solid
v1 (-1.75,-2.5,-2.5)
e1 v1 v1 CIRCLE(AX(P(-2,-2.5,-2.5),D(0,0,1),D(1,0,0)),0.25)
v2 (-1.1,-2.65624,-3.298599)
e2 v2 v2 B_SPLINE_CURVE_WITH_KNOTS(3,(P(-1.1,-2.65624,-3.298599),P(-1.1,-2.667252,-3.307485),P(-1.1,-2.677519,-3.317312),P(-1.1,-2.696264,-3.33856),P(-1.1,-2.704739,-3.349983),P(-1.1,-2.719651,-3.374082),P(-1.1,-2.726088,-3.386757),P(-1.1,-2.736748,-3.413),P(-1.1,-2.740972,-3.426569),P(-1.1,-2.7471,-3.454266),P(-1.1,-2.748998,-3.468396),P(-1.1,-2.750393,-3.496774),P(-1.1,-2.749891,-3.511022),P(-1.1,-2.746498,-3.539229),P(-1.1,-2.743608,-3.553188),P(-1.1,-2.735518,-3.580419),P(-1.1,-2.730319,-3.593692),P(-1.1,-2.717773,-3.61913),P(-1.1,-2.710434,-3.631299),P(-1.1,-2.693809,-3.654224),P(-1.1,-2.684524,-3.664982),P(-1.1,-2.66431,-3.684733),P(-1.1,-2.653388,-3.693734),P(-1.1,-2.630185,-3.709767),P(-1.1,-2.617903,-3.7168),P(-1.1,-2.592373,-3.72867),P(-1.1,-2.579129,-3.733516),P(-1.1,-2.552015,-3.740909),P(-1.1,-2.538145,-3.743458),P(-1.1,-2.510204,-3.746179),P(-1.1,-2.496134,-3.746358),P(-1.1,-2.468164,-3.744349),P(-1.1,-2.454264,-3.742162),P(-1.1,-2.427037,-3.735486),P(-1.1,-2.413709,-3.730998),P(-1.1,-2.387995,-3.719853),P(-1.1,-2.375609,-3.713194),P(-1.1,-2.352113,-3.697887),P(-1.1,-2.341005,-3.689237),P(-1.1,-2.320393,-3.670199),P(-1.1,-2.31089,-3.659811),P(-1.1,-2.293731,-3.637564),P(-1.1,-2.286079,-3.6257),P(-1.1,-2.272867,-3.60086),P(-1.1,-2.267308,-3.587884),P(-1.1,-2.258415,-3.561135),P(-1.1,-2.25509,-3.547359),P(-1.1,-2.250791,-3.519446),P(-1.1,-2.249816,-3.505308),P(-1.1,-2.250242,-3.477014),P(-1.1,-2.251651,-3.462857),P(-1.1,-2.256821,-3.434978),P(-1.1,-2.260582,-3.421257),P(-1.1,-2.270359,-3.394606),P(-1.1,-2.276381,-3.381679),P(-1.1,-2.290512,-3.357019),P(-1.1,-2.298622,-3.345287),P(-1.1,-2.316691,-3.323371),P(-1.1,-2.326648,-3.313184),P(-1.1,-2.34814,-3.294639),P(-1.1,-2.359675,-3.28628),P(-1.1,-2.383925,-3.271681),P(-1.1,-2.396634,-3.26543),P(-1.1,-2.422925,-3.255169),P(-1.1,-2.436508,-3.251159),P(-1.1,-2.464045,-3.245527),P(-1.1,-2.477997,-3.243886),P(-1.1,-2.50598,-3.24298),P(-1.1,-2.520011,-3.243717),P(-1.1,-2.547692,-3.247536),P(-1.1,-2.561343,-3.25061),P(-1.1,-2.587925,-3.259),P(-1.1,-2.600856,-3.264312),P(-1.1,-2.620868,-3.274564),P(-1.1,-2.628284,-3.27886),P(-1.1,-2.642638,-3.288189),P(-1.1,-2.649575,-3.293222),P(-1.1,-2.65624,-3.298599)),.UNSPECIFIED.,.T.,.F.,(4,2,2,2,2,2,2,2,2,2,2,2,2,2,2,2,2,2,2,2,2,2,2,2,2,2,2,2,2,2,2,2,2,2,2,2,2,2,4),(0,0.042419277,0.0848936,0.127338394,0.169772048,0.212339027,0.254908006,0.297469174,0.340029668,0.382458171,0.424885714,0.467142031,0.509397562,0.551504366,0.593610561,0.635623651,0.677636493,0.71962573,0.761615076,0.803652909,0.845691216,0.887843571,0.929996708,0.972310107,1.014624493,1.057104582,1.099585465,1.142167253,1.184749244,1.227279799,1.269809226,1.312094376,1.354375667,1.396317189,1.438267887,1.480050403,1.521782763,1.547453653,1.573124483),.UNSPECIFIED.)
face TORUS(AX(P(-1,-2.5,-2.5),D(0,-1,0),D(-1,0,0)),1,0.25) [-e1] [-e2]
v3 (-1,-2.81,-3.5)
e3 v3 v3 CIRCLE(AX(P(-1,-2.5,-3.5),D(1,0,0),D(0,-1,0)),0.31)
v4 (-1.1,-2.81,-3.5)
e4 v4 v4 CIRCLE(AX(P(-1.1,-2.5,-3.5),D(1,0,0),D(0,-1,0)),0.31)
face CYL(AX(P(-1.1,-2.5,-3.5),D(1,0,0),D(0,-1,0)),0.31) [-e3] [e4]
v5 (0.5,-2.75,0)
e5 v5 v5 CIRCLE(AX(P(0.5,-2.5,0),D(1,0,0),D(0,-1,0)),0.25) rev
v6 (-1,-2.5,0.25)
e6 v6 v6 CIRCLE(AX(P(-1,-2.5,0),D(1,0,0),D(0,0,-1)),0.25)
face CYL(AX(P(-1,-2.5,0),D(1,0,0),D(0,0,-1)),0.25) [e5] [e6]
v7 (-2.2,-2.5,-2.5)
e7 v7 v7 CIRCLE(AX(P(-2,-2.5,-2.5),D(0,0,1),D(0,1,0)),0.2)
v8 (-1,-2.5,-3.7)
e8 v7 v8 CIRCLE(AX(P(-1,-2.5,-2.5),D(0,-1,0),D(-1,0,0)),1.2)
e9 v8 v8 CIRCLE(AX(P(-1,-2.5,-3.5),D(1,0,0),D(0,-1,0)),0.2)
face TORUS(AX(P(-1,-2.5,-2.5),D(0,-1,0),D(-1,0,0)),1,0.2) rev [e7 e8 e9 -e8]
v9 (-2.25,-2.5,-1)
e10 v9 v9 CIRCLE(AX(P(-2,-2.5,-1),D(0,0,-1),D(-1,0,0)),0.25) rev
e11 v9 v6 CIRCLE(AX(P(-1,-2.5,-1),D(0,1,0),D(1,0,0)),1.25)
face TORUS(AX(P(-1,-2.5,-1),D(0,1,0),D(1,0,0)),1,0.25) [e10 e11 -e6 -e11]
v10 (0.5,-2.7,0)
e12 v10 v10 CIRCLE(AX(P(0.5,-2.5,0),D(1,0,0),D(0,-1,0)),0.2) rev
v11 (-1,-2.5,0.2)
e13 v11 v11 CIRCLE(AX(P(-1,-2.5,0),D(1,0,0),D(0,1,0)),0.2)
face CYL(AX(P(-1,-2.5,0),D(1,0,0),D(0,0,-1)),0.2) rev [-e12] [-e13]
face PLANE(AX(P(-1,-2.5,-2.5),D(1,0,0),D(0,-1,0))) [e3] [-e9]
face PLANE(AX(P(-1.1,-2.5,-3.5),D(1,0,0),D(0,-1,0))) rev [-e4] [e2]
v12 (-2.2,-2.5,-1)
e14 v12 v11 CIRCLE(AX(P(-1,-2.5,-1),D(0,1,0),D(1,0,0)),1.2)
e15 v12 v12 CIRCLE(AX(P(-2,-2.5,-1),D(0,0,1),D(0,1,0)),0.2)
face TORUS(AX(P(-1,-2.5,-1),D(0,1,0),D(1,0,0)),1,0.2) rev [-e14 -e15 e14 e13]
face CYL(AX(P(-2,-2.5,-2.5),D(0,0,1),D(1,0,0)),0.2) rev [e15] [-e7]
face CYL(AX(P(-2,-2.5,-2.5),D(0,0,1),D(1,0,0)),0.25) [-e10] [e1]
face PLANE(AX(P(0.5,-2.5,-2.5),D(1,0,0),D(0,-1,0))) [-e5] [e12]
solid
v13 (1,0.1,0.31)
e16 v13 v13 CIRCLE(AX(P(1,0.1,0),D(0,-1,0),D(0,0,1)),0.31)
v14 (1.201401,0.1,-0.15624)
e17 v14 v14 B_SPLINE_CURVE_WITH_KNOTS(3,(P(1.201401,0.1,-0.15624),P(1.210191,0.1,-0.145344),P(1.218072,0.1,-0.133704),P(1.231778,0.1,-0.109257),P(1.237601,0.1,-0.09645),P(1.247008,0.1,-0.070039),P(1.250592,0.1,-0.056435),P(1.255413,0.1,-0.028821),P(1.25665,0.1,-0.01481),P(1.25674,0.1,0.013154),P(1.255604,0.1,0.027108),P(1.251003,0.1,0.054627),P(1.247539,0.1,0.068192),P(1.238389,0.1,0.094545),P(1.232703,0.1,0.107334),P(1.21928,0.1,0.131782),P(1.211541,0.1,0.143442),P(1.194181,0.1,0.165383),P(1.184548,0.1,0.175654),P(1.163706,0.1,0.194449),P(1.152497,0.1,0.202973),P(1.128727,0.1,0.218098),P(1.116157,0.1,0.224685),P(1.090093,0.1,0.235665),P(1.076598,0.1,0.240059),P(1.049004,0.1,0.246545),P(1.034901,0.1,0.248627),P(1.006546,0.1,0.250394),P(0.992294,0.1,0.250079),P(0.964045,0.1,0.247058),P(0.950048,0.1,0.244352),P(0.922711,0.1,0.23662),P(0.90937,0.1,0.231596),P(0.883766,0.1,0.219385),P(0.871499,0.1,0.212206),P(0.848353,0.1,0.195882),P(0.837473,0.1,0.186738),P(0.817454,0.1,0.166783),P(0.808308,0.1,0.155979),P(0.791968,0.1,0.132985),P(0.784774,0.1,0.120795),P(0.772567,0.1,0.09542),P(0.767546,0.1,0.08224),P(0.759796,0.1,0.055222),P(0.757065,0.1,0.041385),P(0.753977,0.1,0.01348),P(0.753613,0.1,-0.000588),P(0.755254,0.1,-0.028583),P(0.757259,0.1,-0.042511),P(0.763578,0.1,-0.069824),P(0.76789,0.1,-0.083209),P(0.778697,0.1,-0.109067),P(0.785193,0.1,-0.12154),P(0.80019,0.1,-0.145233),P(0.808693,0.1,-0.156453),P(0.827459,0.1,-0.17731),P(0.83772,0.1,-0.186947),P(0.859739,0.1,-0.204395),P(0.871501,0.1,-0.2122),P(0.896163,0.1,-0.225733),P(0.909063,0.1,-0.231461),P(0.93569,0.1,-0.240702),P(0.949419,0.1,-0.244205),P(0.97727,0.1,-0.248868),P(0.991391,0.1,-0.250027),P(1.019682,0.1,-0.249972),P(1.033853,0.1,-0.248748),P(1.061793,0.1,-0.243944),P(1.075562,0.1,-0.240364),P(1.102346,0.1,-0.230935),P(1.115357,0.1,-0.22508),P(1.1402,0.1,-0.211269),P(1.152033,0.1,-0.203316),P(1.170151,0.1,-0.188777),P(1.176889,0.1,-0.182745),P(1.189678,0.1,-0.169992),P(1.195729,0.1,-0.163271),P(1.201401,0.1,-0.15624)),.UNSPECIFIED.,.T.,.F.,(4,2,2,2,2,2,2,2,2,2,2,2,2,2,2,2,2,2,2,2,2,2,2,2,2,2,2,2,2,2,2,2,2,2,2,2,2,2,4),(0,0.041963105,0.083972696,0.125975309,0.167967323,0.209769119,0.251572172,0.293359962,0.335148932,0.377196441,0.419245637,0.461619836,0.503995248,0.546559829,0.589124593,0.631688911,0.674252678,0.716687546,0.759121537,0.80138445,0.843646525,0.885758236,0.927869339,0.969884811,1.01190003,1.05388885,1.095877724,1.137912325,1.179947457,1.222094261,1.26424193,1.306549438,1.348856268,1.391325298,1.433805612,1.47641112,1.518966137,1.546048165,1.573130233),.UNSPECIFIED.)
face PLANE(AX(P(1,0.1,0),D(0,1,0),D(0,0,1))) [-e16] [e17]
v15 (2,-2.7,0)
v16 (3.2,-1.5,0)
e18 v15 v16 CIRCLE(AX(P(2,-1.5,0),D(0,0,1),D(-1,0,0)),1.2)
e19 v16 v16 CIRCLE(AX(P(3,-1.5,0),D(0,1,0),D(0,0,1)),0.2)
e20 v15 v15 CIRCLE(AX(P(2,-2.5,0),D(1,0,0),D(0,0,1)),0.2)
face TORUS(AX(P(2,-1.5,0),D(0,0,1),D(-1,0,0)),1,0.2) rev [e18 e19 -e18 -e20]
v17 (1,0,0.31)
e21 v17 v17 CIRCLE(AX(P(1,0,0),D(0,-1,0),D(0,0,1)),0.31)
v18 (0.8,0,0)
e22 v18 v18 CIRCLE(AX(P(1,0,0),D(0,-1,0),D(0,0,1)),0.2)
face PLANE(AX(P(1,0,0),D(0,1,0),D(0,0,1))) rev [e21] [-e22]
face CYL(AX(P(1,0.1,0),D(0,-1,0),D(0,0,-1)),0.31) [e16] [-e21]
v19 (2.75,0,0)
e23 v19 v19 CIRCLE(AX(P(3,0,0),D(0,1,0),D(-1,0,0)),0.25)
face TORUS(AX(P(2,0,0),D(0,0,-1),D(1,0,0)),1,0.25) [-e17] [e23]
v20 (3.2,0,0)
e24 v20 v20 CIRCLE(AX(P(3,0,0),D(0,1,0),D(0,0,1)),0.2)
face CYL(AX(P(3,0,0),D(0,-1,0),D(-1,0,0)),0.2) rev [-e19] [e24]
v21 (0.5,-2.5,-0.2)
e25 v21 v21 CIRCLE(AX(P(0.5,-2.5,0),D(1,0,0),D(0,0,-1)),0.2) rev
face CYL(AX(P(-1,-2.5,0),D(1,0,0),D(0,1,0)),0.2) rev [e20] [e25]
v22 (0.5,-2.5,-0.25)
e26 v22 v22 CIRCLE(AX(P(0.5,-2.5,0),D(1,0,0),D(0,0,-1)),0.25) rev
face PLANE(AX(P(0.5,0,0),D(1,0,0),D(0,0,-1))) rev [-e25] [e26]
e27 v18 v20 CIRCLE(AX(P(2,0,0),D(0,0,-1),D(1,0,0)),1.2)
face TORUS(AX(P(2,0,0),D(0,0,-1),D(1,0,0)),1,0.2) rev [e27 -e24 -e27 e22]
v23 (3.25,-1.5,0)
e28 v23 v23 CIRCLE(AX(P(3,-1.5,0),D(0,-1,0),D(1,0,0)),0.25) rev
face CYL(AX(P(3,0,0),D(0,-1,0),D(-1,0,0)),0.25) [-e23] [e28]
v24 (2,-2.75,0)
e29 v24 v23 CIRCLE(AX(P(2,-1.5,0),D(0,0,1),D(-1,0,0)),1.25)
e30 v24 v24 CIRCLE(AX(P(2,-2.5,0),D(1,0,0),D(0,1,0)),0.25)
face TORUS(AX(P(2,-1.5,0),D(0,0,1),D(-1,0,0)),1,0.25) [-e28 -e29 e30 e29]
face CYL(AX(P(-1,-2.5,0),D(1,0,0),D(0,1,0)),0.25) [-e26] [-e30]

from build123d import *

# Parameters (mm, degrees)
SKETCH3_R             = 0.25
SKETCH3_R_2           = 0.2
SKETCH6_R             = 0.31
SKETCH6_R_2           = 0.21
SPLIT2_START          = -1
SPLIT2_OUTLINE_W      = 3
SPLIT2_OUTLINE_H      = 4
SPLIT2_DEPTH          = 1.31
SKETCH10_R            = 0.31
SKETCH10_R_2          = 0.21
BODY_MOVE_COPY2_ANGLE = 90


# Read off the part's stored shape, not the designer's step: Split1, Split2
with BuildPart() as part:
    # Sweep-Thin1: sweep along a path in Sketch1
    with BuildLine(Plane.XY) as sweep_thin1_path:
        Line((0.5, -2.5), (-1, -2.5))
        ThreePointArc((-1, -2.5), (-1.707106781, -2.207106781), (-2, -1.5))
        Line((-2, -1.5), (-2, 0))
        ThreePointArc((-2, 0), (-1, 1), (0, 0))
    # Sketch3 → Sweep-Thin1 (sweep)
    with BuildSketch(Plane(origin=(0, 0, 0), x_dir=(1, 0, 0), z_dir=(0, 1, 0))):
        Circle(SKETCH3_R)
        Circle(SKETCH3_R_2, mode=Mode.SUBTRACT)
    sweep(path=sweep_thin1_path.line)

    # Sweep-Thin2: sweep along a path in Sketch5
    with BuildLine(Plane.XY) as sweep_thin2_path:
        Line((0, 0), (0, 0.1))
    # Sketch6 → Sweep-Thin2 (sweep)
    with BuildSketch(Plane(origin=(0, 0, 0), x_dir=(1, 0, 0), z_dir=(0, 1, 0))):
        Circle(SKETCH6_R)
        Circle(SKETCH6_R_2, mode=Mode.SUBTRACT)
    sweep(path=sweep_thin2_path.line)

    # Mirror2: part across plane


with BuildPart() as part_1:
    add(part.part)
    add(part.part.mirror(Plane(origin=(0.5, -2.5, 0), x_dir=(0, 0, 1), z_dir=(1, 0, 0))))


with BuildPart() as body_2:
    # Split1: the piece on the far side of the plane
    add(part_1.part)
    split(bisect_by=Plane.YZ.offset(0.5), keep=Keep.BOTTOM)

    # Split2 outline → Split2 (cut)
    with BuildSketch(Plane.YZ.offset(SPLIT2_START)):
        with Locations((1.5, 0)):
            Rectangle(SPLIT2_OUTLINE_W, SPLIT2_OUTLINE_H)
    extrude(amount=SPLIT2_DEPTH, mode=Mode.SUBTRACT)

    # Sweep-Thin3: sweep along a path in Sketch11
    with BuildLine(Plane(origin=(0, 1, 0), x_dir=(1, 0, 0), z_dir=(0, 1, 0))) as sweep_thin3_path:
        Line((-1, 0), (-1.1, 0))
    # Sketch10 → Sweep-Thin3 (sweep)
    with BuildSketch(Plane(origin=(-1, 0, 0), x_dir=(0, 0, -1), z_dir=(1, 0, 0))):
        with Locations((0, 1)):
            Circle(SKETCH10_R)
        with Locations((0, 1)):
            Circle(SKETCH10_R_2, mode=Mode.SUBTRACT)
    sweep(path=sweep_thin3_path.line)


with BuildPart() as part_2:
    add(part_1.part)

    # Split1
    split(bisect_by=Plane.YZ.offset(0.5), keep=Keep.TOP)


with BuildPart() as body_2_1:
    # Body-Move/Copy2: moved
    add(body_2.part.rotate(Axis((0, -2.5, 0), (-1, 0, 0)), BODY_MOVE_COPY2_ANGLE))


solid = Compound([part_2.part, body_2_1.part])
